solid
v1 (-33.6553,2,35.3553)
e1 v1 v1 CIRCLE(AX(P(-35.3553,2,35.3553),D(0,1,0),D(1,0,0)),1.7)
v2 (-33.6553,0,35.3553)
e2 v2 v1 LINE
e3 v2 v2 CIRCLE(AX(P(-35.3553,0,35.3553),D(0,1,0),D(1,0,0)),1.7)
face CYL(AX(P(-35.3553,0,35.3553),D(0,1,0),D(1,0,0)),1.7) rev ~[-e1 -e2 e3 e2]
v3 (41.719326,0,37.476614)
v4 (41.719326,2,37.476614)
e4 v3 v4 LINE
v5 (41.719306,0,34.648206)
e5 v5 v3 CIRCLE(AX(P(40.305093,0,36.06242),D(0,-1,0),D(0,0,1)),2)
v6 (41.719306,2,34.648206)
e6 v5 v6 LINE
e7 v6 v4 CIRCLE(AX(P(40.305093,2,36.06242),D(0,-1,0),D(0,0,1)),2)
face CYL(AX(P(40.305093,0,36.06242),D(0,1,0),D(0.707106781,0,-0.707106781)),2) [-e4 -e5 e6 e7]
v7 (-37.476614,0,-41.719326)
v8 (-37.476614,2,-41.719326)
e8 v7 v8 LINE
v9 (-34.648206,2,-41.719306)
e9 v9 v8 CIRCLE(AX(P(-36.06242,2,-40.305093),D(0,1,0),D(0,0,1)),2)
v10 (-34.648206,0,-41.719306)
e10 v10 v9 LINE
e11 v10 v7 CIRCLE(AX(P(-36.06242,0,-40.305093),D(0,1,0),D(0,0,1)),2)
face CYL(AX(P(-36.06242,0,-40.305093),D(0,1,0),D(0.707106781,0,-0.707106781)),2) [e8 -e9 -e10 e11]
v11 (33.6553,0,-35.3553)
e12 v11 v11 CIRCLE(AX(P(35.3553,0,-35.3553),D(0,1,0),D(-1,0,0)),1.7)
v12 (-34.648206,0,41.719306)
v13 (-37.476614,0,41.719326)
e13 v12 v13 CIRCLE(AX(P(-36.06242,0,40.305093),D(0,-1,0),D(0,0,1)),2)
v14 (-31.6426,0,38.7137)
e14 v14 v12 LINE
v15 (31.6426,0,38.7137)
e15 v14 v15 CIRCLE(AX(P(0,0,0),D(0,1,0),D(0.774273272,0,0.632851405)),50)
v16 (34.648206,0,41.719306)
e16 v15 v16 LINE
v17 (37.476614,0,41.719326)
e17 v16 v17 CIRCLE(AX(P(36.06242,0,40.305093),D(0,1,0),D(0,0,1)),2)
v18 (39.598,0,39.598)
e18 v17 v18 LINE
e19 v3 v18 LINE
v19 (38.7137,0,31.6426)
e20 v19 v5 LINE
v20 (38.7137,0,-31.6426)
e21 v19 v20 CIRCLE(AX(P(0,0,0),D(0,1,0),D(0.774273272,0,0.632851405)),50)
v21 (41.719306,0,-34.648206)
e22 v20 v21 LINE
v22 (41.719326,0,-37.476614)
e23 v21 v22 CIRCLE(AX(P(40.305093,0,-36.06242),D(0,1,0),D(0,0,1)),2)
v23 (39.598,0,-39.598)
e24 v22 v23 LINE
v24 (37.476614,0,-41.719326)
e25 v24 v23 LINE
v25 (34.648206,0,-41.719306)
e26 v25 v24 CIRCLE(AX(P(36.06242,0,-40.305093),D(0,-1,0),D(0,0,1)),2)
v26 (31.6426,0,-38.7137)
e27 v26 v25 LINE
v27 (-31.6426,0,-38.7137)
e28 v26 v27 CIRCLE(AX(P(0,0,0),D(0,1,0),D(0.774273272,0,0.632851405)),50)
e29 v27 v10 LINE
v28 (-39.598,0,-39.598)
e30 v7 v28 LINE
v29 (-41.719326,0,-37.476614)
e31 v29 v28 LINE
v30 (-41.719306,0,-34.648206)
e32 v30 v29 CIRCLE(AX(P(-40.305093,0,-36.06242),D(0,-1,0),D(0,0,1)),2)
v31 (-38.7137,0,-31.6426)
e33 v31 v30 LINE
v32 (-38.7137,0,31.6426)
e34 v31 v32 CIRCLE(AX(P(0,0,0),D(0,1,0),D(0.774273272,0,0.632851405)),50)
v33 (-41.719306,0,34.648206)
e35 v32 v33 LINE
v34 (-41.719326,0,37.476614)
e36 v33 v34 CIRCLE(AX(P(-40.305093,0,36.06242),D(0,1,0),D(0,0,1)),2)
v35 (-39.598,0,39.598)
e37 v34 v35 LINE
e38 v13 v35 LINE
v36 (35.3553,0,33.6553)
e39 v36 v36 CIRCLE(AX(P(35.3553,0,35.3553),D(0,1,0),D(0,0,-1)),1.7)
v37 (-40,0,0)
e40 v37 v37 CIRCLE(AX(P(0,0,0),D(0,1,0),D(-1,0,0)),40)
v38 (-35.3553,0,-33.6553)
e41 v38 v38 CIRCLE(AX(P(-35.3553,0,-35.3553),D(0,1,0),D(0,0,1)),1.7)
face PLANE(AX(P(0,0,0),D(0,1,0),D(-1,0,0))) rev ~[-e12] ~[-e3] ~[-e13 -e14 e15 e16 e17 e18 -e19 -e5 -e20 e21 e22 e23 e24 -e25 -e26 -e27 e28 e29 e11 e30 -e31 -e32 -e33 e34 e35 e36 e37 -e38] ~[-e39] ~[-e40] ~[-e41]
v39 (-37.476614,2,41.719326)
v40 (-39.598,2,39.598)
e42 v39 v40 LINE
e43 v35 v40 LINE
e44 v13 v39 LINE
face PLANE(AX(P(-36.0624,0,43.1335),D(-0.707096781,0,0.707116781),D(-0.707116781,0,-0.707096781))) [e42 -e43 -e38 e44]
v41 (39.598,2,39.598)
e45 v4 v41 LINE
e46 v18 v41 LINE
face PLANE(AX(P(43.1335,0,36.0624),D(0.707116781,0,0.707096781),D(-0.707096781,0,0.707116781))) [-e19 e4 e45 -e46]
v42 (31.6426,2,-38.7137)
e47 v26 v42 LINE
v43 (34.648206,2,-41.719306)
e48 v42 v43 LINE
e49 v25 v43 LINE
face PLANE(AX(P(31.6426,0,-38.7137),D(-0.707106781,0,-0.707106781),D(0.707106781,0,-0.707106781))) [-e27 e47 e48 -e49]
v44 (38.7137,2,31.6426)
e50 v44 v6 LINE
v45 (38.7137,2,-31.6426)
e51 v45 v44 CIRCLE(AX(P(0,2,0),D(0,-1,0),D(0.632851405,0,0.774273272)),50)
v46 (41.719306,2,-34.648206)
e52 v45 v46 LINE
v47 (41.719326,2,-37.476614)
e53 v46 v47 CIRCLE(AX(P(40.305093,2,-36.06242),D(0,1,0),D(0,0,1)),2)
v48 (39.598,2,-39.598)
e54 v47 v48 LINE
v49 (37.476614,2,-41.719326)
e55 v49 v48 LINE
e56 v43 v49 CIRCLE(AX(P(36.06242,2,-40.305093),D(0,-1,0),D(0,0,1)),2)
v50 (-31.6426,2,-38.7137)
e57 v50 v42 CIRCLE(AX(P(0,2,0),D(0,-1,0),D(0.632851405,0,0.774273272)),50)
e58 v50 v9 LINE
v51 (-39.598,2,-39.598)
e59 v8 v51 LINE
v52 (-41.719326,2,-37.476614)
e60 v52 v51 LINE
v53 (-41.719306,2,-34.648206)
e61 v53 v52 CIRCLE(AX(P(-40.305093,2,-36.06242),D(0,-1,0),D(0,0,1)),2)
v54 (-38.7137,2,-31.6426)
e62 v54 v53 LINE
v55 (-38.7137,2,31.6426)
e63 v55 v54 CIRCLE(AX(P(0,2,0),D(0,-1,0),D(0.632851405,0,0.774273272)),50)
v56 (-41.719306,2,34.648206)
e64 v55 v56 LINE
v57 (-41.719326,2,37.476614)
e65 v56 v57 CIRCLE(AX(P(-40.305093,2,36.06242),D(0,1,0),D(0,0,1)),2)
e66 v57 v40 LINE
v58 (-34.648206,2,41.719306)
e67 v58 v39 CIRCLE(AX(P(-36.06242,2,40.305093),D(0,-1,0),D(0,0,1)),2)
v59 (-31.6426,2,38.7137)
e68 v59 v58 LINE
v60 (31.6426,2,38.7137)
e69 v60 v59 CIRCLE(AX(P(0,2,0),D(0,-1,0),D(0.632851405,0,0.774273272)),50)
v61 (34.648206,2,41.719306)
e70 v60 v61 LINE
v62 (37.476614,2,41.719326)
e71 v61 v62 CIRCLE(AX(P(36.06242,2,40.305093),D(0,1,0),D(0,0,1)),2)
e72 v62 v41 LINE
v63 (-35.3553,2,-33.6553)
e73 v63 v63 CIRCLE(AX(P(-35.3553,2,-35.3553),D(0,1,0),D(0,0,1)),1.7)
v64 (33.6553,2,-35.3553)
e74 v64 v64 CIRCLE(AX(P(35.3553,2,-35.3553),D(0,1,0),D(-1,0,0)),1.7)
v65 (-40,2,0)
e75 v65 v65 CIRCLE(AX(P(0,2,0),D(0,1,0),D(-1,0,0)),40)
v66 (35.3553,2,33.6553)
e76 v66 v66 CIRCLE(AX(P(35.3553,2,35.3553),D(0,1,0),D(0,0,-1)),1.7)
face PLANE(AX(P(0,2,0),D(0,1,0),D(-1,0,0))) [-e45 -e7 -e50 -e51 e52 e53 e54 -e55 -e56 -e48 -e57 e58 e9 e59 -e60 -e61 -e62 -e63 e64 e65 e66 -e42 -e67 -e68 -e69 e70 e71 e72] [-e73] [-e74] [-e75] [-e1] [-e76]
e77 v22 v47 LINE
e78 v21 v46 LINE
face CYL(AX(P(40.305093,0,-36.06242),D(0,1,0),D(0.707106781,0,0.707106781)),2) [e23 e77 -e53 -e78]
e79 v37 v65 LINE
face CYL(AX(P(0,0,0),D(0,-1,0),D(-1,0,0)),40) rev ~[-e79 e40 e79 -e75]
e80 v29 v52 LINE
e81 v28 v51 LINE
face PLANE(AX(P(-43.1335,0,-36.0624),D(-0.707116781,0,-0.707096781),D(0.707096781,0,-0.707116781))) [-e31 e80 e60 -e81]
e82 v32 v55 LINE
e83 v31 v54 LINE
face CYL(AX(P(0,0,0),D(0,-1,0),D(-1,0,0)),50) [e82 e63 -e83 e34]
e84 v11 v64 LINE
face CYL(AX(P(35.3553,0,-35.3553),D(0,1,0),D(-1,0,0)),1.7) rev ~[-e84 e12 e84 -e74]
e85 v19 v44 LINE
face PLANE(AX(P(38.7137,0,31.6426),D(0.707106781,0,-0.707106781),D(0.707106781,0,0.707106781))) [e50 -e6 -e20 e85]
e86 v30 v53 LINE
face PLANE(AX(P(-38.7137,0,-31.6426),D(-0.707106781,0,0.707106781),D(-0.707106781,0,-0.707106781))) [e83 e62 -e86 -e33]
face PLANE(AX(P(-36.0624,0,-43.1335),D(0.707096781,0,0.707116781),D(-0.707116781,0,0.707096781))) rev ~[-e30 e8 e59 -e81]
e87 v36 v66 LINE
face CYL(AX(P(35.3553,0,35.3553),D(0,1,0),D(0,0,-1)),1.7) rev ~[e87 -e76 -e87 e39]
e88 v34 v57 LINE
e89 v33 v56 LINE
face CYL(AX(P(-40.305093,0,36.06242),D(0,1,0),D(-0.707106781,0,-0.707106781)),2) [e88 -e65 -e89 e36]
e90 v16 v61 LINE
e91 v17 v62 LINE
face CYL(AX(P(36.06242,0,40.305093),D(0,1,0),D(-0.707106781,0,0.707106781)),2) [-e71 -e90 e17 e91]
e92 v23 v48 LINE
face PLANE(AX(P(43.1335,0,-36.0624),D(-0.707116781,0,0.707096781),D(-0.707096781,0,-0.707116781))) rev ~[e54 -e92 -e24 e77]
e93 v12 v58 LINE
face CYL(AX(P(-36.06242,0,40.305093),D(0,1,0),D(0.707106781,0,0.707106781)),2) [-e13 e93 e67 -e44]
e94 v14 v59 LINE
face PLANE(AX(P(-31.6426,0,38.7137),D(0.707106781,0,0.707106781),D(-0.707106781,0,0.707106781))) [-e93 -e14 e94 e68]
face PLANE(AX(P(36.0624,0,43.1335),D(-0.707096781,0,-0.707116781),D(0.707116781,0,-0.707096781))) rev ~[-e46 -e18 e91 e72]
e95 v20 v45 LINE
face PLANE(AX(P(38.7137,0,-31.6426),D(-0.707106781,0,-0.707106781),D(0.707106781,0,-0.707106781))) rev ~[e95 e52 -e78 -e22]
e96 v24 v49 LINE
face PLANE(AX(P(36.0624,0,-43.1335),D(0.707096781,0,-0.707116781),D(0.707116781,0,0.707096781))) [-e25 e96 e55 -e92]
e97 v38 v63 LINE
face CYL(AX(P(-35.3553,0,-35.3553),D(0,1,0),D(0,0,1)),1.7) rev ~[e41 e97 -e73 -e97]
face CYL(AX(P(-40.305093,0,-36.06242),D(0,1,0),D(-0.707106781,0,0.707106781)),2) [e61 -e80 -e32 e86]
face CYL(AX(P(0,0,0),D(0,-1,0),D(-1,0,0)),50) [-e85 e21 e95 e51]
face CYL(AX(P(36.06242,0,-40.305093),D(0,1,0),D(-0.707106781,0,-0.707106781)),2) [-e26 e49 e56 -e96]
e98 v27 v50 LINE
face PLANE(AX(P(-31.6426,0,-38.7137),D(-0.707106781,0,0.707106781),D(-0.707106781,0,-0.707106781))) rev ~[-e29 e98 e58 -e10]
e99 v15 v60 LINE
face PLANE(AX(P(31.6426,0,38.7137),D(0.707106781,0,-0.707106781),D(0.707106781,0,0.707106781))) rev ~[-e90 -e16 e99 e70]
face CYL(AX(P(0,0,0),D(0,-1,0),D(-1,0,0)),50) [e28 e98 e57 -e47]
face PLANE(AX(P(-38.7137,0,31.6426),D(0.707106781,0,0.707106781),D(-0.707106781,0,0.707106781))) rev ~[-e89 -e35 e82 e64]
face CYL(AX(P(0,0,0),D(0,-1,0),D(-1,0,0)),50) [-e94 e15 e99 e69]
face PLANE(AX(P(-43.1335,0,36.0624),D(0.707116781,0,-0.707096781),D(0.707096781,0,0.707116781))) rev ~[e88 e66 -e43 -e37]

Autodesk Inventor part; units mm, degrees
ref_plane "YZ Plane" through (0, 0, 0) normal (1, 0, 0) x (0, 1, 0)
ref_plane "XZ Plane" through (0, 0, 0) normal (0, 1, 0) x (-1, 0, 0)
ref_plane "XY Plane" through (0, 0, 0) normal (0, 0, 1) x (1, 0, 0)
sketch "Sketch1" plane through (0, 0, 0) normal (0, 1, 0) x (-1, 0, 0)
  circle A0 centre (0, 0) radius 40
  circle A1 centre (0, 0) radius 50
  dimension "d0" = 80
  dimension "d1" = 100
extrude "Extrusion1" add sketch "Sketch1" along normal blind 2
sketch "Sketch2" plane through (0, 0, 0) normal (0, 1, 0) x (-1, 0, 0)
  line L0 (0, 0) -> (-39.598, 39.598) construction
  circle A0 centre (0, 0) radius 50 construction
  line L1 (-31.6426, 38.7137) -> (-36.0624, 43.1335)
  line L2 (-36.0624, 43.1335) -> (-39.598, 39.598)
  line L3 (70, 0) -> (-70, 0) construction
  line L4 (-38.7137, 31.6426) -> (-43.1335, 36.0624)
  line L5 (-43.1335, 36.0624) -> (-39.598, 39.598)
  arc A1 (-31.6426, 38.7137) -> (-38.7137, 31.6426) centre (0, 0) ccw
  dimension "d4" = 56
  dimension "d6" = 5
  dimension "d7" = 45
extrude "Extrusion2" add sketch "Sketch2" along normal blind 2
fillet "Fillet1" radius 2 2 edges at (43.1335, 1, 36.0624) (36.0624, 1, 43.1335)
sketch "Sketch3" plane through (0, 0, 0) normal (0, -1, 0) x (1, 0, 0)
  line L0 (0, 0) -> (39.598, 39.598) construction
  line L1 (37.4767, 41.7193) -> (41.7193, 37.4767) construction
  point P0 (35.3553, 35.3553)
  dimension "d11" = 50
hole "Hole1" at (35.3553, 0, 35.3553) direction (0, 1, 0) diameter 3.4 end through all clearance for "Countersunk Flat Head Screw ISO 2009/7046" size "M3" standard "ISO"
pattern_circular "Circular Pattern1" count 4 over 360 about axis through (0, -10, 0) along (0, 1, 0) of "Hole1", "Fillet1", "Extrusion2"
properties part number "Succ_Plate"
